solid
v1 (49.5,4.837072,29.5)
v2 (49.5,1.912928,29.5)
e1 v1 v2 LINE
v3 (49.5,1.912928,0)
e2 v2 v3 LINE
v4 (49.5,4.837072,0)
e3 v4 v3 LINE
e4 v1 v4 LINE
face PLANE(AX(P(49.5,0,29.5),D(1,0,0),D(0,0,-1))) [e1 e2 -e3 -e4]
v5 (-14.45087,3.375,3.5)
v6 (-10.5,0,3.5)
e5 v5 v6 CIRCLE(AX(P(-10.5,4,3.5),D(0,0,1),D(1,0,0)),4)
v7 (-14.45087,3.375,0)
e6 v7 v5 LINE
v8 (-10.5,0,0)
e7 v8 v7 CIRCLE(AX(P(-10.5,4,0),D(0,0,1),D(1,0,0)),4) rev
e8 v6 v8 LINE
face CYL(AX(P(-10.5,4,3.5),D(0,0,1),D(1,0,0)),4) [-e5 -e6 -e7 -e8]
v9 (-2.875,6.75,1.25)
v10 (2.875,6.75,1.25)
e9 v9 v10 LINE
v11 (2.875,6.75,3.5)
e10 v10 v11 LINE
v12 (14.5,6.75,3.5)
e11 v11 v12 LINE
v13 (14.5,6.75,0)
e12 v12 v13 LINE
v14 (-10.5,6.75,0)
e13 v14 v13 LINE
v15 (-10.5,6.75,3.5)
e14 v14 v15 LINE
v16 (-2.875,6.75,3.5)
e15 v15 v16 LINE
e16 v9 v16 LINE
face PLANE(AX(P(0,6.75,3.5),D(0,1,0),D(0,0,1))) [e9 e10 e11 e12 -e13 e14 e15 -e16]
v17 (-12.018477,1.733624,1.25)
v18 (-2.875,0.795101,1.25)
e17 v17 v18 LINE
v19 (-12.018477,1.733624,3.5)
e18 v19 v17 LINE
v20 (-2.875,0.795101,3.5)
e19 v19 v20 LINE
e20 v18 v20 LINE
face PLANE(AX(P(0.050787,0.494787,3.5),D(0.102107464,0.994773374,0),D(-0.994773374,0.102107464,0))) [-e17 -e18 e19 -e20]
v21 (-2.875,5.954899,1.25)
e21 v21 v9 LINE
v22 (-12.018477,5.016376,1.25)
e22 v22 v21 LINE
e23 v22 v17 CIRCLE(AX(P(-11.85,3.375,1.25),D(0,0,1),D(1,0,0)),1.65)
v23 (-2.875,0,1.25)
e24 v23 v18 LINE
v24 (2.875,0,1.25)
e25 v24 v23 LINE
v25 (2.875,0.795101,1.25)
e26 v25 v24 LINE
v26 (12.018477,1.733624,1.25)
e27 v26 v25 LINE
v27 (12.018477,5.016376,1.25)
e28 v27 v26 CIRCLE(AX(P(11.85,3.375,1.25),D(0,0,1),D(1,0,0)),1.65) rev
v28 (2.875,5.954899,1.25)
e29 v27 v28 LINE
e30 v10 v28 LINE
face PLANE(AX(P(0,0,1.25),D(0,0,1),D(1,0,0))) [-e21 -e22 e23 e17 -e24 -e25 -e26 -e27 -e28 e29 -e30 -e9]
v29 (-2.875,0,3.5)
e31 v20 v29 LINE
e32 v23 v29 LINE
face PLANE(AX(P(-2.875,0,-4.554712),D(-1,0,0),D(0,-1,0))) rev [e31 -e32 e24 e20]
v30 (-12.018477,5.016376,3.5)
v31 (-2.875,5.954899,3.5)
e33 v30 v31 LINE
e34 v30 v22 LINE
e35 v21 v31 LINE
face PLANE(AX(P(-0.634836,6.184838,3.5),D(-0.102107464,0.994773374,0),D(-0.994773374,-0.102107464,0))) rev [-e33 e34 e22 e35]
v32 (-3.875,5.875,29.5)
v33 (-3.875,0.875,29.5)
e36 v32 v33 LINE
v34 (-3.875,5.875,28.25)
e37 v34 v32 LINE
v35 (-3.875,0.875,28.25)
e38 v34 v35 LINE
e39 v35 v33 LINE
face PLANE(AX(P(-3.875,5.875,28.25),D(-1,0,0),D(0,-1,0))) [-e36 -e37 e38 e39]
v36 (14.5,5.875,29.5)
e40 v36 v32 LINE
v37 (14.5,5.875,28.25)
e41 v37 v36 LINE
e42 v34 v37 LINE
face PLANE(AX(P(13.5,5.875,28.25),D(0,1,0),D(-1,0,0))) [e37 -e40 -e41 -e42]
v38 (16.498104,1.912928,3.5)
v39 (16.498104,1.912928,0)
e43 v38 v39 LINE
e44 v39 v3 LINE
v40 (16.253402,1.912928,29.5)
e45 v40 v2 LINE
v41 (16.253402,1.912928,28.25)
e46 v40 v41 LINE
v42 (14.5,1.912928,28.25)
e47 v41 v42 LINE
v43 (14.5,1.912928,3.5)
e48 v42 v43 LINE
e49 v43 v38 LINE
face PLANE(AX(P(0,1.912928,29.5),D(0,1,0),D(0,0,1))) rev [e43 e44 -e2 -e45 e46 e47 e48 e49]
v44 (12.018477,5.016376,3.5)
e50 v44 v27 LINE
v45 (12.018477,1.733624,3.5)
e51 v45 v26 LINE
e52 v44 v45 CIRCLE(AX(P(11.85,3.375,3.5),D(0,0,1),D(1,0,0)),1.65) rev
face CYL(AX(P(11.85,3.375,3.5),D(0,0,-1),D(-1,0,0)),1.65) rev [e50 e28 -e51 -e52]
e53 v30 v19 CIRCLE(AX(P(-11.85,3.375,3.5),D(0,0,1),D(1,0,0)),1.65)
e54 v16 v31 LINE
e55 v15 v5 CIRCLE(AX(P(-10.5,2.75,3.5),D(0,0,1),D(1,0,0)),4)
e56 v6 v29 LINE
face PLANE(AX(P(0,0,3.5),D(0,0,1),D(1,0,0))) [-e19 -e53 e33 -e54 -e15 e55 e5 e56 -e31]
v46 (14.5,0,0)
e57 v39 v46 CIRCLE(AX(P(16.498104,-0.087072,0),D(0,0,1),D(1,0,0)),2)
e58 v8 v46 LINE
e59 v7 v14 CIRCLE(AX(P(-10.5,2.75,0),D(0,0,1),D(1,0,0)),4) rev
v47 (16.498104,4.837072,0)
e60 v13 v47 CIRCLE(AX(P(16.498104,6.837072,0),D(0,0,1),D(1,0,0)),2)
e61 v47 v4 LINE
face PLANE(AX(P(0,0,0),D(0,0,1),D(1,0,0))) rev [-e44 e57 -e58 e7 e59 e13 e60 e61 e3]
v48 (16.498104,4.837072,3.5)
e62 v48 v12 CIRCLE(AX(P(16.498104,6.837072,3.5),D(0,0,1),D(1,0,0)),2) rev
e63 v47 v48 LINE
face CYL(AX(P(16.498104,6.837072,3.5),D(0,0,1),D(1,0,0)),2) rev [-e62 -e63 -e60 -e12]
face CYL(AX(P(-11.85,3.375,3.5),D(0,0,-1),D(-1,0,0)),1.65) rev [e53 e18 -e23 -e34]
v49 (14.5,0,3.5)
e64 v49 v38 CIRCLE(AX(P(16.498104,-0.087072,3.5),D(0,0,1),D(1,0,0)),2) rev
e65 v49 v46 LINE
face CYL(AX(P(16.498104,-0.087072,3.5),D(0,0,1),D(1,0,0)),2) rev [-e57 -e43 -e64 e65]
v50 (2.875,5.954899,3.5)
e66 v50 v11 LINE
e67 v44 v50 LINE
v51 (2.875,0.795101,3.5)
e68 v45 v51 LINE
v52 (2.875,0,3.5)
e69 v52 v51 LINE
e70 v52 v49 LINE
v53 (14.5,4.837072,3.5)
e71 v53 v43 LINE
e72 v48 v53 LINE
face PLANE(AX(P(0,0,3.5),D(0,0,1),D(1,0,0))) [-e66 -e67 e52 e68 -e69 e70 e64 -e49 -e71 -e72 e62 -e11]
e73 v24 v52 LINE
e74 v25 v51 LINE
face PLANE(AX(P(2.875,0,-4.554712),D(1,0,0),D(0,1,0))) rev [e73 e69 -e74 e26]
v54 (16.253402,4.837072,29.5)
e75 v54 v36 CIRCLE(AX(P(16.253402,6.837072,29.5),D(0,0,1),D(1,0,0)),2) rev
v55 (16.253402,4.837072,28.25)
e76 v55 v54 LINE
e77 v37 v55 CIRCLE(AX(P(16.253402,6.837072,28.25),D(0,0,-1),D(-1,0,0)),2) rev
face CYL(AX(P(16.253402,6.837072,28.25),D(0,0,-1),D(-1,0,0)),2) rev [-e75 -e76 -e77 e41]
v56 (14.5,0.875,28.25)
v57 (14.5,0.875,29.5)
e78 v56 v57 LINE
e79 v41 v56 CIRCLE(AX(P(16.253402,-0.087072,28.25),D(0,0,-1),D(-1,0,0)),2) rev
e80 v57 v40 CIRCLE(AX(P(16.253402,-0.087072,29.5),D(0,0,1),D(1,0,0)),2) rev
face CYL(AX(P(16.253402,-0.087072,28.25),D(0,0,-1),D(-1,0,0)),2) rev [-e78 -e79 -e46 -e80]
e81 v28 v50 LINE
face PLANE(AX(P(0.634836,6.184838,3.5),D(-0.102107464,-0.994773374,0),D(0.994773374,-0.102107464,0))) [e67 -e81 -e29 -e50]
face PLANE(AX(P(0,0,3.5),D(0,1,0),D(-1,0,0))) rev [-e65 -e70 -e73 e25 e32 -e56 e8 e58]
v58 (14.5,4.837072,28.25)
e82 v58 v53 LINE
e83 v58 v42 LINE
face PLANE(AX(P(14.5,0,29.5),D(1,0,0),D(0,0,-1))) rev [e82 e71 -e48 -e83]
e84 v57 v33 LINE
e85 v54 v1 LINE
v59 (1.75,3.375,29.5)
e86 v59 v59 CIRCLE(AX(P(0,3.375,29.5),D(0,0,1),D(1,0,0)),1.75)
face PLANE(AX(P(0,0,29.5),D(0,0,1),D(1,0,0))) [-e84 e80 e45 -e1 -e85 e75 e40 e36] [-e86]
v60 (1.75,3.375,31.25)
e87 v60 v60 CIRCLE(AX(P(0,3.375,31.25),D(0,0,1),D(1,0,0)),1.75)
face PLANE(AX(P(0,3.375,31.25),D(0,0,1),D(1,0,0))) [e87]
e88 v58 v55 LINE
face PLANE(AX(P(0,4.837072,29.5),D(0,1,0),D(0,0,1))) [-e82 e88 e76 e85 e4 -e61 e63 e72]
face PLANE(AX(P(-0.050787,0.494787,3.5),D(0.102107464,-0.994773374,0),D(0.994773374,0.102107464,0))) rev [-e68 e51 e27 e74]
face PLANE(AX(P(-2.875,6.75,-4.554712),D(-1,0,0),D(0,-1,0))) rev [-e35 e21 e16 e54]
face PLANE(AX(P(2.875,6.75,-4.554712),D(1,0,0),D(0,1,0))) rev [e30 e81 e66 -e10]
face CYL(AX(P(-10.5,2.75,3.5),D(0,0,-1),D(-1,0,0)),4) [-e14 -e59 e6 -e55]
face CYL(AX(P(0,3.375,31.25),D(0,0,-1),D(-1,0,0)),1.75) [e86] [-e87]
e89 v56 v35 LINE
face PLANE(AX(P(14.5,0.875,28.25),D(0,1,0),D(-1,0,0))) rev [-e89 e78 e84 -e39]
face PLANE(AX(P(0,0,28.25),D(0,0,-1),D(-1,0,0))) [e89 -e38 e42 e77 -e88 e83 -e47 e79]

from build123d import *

# Parameters (mm, degrees)
SKETCH1_W            = 29
SKETCH1_H            = 6.75
BOSS_EXTRUDE10_DEPTH = 3.5
SKETCH1_16_R         = 0.291434634
BOSS_EXTRUDE15_DEPTH = 1.25
SKETCH1_17_W         = 35
SKETCH1_17_H         = 2.924143722
BOSS_EXTRUDE17_DEPTH = 29.5
BOSS_EXTRUDE18_DEPTH = 1.25
SKETCH2_9_R          = 1.75
BOSS_EXTRUDE19_DEPTH = 1.75
FILLET1_R            = 2
FILLET2_R            = 4
SKETCH3_W            = 5.75
SKETCH3_H            = 0.795101344
CUT_EXTRUDE1_DEPTH   = 2.25


with BuildPart() as part:
    # Sketch1 → Boss-Extrude10 (new body)
    with BuildSketch(Plane.XY):
        with Locations((0, 3.375)):
            Rectangle(SKETCH1_W, SKETCH1_H)
        with BuildLine():
            Line((-12.018477316, 5.016376067), (0, 6.25))
            Line((0, 6.25), (12.018477316, 5.016376067))
            ThreePointArc((12.018477316, 5.016376067), (13.5, 3.375), (12.018477316, 1.733623933))
            Line((12.018477316, 1.733623933), (0, 0.5))
            Line((0, 0.5), (-12.018477316, 1.733623933))
            ThreePointArc((-12.018477316, 1.733623933), (-13.5, 3.375), (-12.018477316, 5.016376067))
        make_face(mode=Mode.SUBTRACT)
    extrude(amount=BOSS_EXTRUDE10_DEPTH)

    # Sketch1<16> → Boss-Extrude15 (add)
    # profile 1 of 9: a face of its own
    with BuildSketch(Plane.XY):
        with BuildLine():
            Line((-0.584049273, 6.190050878), (-12.018477316, 5.016376067))
            ThreePointArc((-12.018477316, 5.016376067), (-13.5, 3.375), (-12.018477316, 1.733623933))
            Line((-12.018477316, 1.733623933), (-0.584049273, 0.559949122))
            ThreePointArc((-0.584049273, 0.559949122), (-2.875, 3.375), (-0.584049273, 6.190050878))
        make_face()
        with Locations((-11.85, 3.375)):
            Circle(SKETCH1_16_R, mode=Mode.SUBTRACT)
        with Locations((-9.813185408, 3.375)):
            Circle(SKETCH1_16_R, mode=Mode.SUBTRACT)
        with Locations((-7.776370816, 3.375)):
            Circle(SKETCH1_16_R, mode=Mode.SUBTRACT)
    # profile 2 of 9: a face of its own
    with BuildSketch(Plane.XY):
        with Locations((-11.85, 3.375)):
            Circle(SKETCH1_16_R)
    # profile 3 of 9: a face of its own
    with BuildSketch(Plane.XY):
        with Locations((-7.776370816, 3.375)):
            Circle(SKETCH1_16_R)
    # profile 4 of 9: a face of its own
    with BuildSketch(Plane.XY):
        with Locations((-9.813185408, 3.375)):
            Circle(SKETCH1_16_R)
    # profile 5 of 9: a face of its own
    with BuildSketch(Plane.XY):
        with BuildLine():
            Line((0, 6.25), (-0.584049273, 6.190050878))
            ThreePointArc((-0.584049273, 6.190050878), (-2.875, 3.375), (-0.584049273, 0.559949122))
            Line((-0.584049273, 0.559949122), (0, 0.5))
            Line((0, 0.5), (0.584049273, 0.559949122))
            ThreePointArc((0.584049273, 0.559949122), (2.229884152, 1.56027091), (2.875, 3.375))
            ThreePointArc((2.875, 3.375), (2.229884152, 5.18972909), (0.584049273, 6.190050878))
            Line((0.584049273, 6.190050878), (0, 6.25))
        make_face()
    # profile 6 of 9: a face of its own
    with BuildSketch(Plane.XY):
        with BuildLine():
            Line((12.018477316, 5.016376067), (0.584049273, 6.190050878))
            ThreePointArc((0.584049273, 6.190050878), (2.229884152, 5.18972909), (2.875, 3.375))
            ThreePointArc((2.875, 3.375), (2.229884152, 1.56027091), (0.584049273, 0.559949122))
            Line((0.584049273, 0.559949122), (12.018477316, 1.733623933))
            ThreePointArc((12.018477316, 1.733623933), (13.5, 3.375), (12.018477316, 5.016376067))
        make_face()
        with Locations((7.776370816, 3.375)):
            Circle(SKETCH1_16_R, mode=Mode.SUBTRACT)
        with Locations((9.813185408, 3.375)):
            Circle(SKETCH1_16_R, mode=Mode.SUBTRACT)
        with Locations((11.85, 3.375)):
            Circle(SKETCH1_16_R, mode=Mode.SUBTRACT)
    # profile 7 of 9: a face of its own
    with BuildSketch(Plane.XY):
        with Locations((11.85, 3.375)):
            Circle(SKETCH1_16_R)
    # profile 8 of 9: a face of its own
    with BuildSketch(Plane.XY):
        with Locations((9.813185408, 3.375)):
            Circle(SKETCH1_16_R)
    # profile 9 of 9: a face of its own
    with BuildSketch(Plane.XY):
        with Locations((7.776370816, 3.375)):
            Circle(SKETCH1_16_R)
    extrude(amount=BOSS_EXTRUDE15_DEPTH)

    # Sketch1<17> → Boss-Extrude17 (add)
    with BuildSketch(Plane.XY):
        with Locations((32, 3.375)):
            Rectangle(SKETCH1_17_W, SKETCH1_17_H)
    extrude(amount=BOSS_EXTRUDE17_DEPTH)

    # Sketch2 → Boss-Extrude18 (add)
    with BuildSketch(Plane.XY.offset(29.5)):
        Polygon((13.5, 5.875), (-3.875, 5.875), (-3.875, 0.875), (14.5, 0.875), (14.5, 5.875), align=None)
    extrude(amount=-BOSS_EXTRUDE18_DEPTH)

    # Sketch2<9> → Boss-Extrude19 (add)
    with BuildSketch(Plane.XY.offset(29.5)):
        with Locations((0, 3.375)):
            Circle(SKETCH2_9_R)
    extrude(amount=BOSS_EXTRUDE19_DEPTH)

    # Fillet1
    # the kernel refuses this fillet: 2 mm, written as the material it adds along each edge
    with BuildSketch(Plane(origin=(14.5, 1.912928139, 0), x_dir=(0, -1, 0), z_dir=(0, 0, 1))) as fillet1_piece_1:
        with BuildLine():
            CenterArc((2, 1.998103724), FILLET1_R, 180, 87.504786267)
            Line((0, 1.998103724), (0, 0))
            Line((0, 0), (1.912928139, 0))
        make_face()
    extrude(amount=3.5)
    with BuildSketch(Plane(origin=(14.5, 4.837071861, 0), x_dir=(1, 0, 0), z_dir=(0, 0, 1))) as fillet1_piece_2:
        with BuildLine():
            CenterArc((1.998103724, 2), FILLET1_R, 182.495213733, 87.504786267)
            Line((0, 1.912928139), (0, 0))
            Line((0, 0), (1.998103724, 0))
        make_face()
    extrude(amount=3.5)
    with BuildSketch(Plane(origin=(14.5, 1.912928139, 28.25), x_dir=(1, 0, 0), z_dir=(0, 0, 1))) as fillet1_piece_3:
        with BuildLine():
            CenterArc((1.753401761, -2), FILLET1_R, 90, 61.246917848)
            Line((0, -1.037928139), (0, 0))
            Line((0, 0), (1.753401761, 0))
        make_face()
    extrude(amount=1.25)
    with BuildSketch(Plane(origin=(14.5, 4.837071861, 28.25), x_dir=(1, 0, 0), z_dir=(0, 0, 1))) as fillet1_piece_4:
        with BuildLine():
            CenterArc((1.753401761, 2), FILLET1_R, 208.753082152, 61.246917848)
            Line((0, 1.037928139), (0, 0))
            Line((0, 0), (1.753401761, 0))
        make_face()
    extrude(amount=1.25)

    # Fillet2
    # the kernel refuses this fillet: 4 mm, written as the material it takes off along each edge
    with BuildSketch(Plane(origin=(-14.5, 6.75, -10), x_dir=(0, -1, 0), z_dir=(0, 0, 1)), Plane(origin=(-14.5, 0, -10), x_dir=(1, 0, 0), z_dir=(0, 0, 1))) as fillet2_piece_1:
        with BuildLine():
            CenterArc((FILLET2_R, FILLET2_R), FILLET2_R, 180, 90)
            Line((0, FILLET2_R), (0, 0))
            Line((0, 0), (FILLET2_R, 0))
        make_face()
    extrude(amount=23.5, mode=Mode.SUBTRACT)

    # Sketch3 → Cut-Extrude1 (cut)
    with BuildSketch(Plane.XY.offset(3.5)):
        with Locations((0, 0.397550672)):
            Rectangle(SKETCH3_W, SKETCH3_H)
        with Locations((0, 6.352449328)):
            Rectangle(SKETCH3_W, SKETCH3_H)
    extrude(amount=-CUT_EXTRUDE1_DEPTH, mode=Mode.SUBTRACT)


solid = part.part
